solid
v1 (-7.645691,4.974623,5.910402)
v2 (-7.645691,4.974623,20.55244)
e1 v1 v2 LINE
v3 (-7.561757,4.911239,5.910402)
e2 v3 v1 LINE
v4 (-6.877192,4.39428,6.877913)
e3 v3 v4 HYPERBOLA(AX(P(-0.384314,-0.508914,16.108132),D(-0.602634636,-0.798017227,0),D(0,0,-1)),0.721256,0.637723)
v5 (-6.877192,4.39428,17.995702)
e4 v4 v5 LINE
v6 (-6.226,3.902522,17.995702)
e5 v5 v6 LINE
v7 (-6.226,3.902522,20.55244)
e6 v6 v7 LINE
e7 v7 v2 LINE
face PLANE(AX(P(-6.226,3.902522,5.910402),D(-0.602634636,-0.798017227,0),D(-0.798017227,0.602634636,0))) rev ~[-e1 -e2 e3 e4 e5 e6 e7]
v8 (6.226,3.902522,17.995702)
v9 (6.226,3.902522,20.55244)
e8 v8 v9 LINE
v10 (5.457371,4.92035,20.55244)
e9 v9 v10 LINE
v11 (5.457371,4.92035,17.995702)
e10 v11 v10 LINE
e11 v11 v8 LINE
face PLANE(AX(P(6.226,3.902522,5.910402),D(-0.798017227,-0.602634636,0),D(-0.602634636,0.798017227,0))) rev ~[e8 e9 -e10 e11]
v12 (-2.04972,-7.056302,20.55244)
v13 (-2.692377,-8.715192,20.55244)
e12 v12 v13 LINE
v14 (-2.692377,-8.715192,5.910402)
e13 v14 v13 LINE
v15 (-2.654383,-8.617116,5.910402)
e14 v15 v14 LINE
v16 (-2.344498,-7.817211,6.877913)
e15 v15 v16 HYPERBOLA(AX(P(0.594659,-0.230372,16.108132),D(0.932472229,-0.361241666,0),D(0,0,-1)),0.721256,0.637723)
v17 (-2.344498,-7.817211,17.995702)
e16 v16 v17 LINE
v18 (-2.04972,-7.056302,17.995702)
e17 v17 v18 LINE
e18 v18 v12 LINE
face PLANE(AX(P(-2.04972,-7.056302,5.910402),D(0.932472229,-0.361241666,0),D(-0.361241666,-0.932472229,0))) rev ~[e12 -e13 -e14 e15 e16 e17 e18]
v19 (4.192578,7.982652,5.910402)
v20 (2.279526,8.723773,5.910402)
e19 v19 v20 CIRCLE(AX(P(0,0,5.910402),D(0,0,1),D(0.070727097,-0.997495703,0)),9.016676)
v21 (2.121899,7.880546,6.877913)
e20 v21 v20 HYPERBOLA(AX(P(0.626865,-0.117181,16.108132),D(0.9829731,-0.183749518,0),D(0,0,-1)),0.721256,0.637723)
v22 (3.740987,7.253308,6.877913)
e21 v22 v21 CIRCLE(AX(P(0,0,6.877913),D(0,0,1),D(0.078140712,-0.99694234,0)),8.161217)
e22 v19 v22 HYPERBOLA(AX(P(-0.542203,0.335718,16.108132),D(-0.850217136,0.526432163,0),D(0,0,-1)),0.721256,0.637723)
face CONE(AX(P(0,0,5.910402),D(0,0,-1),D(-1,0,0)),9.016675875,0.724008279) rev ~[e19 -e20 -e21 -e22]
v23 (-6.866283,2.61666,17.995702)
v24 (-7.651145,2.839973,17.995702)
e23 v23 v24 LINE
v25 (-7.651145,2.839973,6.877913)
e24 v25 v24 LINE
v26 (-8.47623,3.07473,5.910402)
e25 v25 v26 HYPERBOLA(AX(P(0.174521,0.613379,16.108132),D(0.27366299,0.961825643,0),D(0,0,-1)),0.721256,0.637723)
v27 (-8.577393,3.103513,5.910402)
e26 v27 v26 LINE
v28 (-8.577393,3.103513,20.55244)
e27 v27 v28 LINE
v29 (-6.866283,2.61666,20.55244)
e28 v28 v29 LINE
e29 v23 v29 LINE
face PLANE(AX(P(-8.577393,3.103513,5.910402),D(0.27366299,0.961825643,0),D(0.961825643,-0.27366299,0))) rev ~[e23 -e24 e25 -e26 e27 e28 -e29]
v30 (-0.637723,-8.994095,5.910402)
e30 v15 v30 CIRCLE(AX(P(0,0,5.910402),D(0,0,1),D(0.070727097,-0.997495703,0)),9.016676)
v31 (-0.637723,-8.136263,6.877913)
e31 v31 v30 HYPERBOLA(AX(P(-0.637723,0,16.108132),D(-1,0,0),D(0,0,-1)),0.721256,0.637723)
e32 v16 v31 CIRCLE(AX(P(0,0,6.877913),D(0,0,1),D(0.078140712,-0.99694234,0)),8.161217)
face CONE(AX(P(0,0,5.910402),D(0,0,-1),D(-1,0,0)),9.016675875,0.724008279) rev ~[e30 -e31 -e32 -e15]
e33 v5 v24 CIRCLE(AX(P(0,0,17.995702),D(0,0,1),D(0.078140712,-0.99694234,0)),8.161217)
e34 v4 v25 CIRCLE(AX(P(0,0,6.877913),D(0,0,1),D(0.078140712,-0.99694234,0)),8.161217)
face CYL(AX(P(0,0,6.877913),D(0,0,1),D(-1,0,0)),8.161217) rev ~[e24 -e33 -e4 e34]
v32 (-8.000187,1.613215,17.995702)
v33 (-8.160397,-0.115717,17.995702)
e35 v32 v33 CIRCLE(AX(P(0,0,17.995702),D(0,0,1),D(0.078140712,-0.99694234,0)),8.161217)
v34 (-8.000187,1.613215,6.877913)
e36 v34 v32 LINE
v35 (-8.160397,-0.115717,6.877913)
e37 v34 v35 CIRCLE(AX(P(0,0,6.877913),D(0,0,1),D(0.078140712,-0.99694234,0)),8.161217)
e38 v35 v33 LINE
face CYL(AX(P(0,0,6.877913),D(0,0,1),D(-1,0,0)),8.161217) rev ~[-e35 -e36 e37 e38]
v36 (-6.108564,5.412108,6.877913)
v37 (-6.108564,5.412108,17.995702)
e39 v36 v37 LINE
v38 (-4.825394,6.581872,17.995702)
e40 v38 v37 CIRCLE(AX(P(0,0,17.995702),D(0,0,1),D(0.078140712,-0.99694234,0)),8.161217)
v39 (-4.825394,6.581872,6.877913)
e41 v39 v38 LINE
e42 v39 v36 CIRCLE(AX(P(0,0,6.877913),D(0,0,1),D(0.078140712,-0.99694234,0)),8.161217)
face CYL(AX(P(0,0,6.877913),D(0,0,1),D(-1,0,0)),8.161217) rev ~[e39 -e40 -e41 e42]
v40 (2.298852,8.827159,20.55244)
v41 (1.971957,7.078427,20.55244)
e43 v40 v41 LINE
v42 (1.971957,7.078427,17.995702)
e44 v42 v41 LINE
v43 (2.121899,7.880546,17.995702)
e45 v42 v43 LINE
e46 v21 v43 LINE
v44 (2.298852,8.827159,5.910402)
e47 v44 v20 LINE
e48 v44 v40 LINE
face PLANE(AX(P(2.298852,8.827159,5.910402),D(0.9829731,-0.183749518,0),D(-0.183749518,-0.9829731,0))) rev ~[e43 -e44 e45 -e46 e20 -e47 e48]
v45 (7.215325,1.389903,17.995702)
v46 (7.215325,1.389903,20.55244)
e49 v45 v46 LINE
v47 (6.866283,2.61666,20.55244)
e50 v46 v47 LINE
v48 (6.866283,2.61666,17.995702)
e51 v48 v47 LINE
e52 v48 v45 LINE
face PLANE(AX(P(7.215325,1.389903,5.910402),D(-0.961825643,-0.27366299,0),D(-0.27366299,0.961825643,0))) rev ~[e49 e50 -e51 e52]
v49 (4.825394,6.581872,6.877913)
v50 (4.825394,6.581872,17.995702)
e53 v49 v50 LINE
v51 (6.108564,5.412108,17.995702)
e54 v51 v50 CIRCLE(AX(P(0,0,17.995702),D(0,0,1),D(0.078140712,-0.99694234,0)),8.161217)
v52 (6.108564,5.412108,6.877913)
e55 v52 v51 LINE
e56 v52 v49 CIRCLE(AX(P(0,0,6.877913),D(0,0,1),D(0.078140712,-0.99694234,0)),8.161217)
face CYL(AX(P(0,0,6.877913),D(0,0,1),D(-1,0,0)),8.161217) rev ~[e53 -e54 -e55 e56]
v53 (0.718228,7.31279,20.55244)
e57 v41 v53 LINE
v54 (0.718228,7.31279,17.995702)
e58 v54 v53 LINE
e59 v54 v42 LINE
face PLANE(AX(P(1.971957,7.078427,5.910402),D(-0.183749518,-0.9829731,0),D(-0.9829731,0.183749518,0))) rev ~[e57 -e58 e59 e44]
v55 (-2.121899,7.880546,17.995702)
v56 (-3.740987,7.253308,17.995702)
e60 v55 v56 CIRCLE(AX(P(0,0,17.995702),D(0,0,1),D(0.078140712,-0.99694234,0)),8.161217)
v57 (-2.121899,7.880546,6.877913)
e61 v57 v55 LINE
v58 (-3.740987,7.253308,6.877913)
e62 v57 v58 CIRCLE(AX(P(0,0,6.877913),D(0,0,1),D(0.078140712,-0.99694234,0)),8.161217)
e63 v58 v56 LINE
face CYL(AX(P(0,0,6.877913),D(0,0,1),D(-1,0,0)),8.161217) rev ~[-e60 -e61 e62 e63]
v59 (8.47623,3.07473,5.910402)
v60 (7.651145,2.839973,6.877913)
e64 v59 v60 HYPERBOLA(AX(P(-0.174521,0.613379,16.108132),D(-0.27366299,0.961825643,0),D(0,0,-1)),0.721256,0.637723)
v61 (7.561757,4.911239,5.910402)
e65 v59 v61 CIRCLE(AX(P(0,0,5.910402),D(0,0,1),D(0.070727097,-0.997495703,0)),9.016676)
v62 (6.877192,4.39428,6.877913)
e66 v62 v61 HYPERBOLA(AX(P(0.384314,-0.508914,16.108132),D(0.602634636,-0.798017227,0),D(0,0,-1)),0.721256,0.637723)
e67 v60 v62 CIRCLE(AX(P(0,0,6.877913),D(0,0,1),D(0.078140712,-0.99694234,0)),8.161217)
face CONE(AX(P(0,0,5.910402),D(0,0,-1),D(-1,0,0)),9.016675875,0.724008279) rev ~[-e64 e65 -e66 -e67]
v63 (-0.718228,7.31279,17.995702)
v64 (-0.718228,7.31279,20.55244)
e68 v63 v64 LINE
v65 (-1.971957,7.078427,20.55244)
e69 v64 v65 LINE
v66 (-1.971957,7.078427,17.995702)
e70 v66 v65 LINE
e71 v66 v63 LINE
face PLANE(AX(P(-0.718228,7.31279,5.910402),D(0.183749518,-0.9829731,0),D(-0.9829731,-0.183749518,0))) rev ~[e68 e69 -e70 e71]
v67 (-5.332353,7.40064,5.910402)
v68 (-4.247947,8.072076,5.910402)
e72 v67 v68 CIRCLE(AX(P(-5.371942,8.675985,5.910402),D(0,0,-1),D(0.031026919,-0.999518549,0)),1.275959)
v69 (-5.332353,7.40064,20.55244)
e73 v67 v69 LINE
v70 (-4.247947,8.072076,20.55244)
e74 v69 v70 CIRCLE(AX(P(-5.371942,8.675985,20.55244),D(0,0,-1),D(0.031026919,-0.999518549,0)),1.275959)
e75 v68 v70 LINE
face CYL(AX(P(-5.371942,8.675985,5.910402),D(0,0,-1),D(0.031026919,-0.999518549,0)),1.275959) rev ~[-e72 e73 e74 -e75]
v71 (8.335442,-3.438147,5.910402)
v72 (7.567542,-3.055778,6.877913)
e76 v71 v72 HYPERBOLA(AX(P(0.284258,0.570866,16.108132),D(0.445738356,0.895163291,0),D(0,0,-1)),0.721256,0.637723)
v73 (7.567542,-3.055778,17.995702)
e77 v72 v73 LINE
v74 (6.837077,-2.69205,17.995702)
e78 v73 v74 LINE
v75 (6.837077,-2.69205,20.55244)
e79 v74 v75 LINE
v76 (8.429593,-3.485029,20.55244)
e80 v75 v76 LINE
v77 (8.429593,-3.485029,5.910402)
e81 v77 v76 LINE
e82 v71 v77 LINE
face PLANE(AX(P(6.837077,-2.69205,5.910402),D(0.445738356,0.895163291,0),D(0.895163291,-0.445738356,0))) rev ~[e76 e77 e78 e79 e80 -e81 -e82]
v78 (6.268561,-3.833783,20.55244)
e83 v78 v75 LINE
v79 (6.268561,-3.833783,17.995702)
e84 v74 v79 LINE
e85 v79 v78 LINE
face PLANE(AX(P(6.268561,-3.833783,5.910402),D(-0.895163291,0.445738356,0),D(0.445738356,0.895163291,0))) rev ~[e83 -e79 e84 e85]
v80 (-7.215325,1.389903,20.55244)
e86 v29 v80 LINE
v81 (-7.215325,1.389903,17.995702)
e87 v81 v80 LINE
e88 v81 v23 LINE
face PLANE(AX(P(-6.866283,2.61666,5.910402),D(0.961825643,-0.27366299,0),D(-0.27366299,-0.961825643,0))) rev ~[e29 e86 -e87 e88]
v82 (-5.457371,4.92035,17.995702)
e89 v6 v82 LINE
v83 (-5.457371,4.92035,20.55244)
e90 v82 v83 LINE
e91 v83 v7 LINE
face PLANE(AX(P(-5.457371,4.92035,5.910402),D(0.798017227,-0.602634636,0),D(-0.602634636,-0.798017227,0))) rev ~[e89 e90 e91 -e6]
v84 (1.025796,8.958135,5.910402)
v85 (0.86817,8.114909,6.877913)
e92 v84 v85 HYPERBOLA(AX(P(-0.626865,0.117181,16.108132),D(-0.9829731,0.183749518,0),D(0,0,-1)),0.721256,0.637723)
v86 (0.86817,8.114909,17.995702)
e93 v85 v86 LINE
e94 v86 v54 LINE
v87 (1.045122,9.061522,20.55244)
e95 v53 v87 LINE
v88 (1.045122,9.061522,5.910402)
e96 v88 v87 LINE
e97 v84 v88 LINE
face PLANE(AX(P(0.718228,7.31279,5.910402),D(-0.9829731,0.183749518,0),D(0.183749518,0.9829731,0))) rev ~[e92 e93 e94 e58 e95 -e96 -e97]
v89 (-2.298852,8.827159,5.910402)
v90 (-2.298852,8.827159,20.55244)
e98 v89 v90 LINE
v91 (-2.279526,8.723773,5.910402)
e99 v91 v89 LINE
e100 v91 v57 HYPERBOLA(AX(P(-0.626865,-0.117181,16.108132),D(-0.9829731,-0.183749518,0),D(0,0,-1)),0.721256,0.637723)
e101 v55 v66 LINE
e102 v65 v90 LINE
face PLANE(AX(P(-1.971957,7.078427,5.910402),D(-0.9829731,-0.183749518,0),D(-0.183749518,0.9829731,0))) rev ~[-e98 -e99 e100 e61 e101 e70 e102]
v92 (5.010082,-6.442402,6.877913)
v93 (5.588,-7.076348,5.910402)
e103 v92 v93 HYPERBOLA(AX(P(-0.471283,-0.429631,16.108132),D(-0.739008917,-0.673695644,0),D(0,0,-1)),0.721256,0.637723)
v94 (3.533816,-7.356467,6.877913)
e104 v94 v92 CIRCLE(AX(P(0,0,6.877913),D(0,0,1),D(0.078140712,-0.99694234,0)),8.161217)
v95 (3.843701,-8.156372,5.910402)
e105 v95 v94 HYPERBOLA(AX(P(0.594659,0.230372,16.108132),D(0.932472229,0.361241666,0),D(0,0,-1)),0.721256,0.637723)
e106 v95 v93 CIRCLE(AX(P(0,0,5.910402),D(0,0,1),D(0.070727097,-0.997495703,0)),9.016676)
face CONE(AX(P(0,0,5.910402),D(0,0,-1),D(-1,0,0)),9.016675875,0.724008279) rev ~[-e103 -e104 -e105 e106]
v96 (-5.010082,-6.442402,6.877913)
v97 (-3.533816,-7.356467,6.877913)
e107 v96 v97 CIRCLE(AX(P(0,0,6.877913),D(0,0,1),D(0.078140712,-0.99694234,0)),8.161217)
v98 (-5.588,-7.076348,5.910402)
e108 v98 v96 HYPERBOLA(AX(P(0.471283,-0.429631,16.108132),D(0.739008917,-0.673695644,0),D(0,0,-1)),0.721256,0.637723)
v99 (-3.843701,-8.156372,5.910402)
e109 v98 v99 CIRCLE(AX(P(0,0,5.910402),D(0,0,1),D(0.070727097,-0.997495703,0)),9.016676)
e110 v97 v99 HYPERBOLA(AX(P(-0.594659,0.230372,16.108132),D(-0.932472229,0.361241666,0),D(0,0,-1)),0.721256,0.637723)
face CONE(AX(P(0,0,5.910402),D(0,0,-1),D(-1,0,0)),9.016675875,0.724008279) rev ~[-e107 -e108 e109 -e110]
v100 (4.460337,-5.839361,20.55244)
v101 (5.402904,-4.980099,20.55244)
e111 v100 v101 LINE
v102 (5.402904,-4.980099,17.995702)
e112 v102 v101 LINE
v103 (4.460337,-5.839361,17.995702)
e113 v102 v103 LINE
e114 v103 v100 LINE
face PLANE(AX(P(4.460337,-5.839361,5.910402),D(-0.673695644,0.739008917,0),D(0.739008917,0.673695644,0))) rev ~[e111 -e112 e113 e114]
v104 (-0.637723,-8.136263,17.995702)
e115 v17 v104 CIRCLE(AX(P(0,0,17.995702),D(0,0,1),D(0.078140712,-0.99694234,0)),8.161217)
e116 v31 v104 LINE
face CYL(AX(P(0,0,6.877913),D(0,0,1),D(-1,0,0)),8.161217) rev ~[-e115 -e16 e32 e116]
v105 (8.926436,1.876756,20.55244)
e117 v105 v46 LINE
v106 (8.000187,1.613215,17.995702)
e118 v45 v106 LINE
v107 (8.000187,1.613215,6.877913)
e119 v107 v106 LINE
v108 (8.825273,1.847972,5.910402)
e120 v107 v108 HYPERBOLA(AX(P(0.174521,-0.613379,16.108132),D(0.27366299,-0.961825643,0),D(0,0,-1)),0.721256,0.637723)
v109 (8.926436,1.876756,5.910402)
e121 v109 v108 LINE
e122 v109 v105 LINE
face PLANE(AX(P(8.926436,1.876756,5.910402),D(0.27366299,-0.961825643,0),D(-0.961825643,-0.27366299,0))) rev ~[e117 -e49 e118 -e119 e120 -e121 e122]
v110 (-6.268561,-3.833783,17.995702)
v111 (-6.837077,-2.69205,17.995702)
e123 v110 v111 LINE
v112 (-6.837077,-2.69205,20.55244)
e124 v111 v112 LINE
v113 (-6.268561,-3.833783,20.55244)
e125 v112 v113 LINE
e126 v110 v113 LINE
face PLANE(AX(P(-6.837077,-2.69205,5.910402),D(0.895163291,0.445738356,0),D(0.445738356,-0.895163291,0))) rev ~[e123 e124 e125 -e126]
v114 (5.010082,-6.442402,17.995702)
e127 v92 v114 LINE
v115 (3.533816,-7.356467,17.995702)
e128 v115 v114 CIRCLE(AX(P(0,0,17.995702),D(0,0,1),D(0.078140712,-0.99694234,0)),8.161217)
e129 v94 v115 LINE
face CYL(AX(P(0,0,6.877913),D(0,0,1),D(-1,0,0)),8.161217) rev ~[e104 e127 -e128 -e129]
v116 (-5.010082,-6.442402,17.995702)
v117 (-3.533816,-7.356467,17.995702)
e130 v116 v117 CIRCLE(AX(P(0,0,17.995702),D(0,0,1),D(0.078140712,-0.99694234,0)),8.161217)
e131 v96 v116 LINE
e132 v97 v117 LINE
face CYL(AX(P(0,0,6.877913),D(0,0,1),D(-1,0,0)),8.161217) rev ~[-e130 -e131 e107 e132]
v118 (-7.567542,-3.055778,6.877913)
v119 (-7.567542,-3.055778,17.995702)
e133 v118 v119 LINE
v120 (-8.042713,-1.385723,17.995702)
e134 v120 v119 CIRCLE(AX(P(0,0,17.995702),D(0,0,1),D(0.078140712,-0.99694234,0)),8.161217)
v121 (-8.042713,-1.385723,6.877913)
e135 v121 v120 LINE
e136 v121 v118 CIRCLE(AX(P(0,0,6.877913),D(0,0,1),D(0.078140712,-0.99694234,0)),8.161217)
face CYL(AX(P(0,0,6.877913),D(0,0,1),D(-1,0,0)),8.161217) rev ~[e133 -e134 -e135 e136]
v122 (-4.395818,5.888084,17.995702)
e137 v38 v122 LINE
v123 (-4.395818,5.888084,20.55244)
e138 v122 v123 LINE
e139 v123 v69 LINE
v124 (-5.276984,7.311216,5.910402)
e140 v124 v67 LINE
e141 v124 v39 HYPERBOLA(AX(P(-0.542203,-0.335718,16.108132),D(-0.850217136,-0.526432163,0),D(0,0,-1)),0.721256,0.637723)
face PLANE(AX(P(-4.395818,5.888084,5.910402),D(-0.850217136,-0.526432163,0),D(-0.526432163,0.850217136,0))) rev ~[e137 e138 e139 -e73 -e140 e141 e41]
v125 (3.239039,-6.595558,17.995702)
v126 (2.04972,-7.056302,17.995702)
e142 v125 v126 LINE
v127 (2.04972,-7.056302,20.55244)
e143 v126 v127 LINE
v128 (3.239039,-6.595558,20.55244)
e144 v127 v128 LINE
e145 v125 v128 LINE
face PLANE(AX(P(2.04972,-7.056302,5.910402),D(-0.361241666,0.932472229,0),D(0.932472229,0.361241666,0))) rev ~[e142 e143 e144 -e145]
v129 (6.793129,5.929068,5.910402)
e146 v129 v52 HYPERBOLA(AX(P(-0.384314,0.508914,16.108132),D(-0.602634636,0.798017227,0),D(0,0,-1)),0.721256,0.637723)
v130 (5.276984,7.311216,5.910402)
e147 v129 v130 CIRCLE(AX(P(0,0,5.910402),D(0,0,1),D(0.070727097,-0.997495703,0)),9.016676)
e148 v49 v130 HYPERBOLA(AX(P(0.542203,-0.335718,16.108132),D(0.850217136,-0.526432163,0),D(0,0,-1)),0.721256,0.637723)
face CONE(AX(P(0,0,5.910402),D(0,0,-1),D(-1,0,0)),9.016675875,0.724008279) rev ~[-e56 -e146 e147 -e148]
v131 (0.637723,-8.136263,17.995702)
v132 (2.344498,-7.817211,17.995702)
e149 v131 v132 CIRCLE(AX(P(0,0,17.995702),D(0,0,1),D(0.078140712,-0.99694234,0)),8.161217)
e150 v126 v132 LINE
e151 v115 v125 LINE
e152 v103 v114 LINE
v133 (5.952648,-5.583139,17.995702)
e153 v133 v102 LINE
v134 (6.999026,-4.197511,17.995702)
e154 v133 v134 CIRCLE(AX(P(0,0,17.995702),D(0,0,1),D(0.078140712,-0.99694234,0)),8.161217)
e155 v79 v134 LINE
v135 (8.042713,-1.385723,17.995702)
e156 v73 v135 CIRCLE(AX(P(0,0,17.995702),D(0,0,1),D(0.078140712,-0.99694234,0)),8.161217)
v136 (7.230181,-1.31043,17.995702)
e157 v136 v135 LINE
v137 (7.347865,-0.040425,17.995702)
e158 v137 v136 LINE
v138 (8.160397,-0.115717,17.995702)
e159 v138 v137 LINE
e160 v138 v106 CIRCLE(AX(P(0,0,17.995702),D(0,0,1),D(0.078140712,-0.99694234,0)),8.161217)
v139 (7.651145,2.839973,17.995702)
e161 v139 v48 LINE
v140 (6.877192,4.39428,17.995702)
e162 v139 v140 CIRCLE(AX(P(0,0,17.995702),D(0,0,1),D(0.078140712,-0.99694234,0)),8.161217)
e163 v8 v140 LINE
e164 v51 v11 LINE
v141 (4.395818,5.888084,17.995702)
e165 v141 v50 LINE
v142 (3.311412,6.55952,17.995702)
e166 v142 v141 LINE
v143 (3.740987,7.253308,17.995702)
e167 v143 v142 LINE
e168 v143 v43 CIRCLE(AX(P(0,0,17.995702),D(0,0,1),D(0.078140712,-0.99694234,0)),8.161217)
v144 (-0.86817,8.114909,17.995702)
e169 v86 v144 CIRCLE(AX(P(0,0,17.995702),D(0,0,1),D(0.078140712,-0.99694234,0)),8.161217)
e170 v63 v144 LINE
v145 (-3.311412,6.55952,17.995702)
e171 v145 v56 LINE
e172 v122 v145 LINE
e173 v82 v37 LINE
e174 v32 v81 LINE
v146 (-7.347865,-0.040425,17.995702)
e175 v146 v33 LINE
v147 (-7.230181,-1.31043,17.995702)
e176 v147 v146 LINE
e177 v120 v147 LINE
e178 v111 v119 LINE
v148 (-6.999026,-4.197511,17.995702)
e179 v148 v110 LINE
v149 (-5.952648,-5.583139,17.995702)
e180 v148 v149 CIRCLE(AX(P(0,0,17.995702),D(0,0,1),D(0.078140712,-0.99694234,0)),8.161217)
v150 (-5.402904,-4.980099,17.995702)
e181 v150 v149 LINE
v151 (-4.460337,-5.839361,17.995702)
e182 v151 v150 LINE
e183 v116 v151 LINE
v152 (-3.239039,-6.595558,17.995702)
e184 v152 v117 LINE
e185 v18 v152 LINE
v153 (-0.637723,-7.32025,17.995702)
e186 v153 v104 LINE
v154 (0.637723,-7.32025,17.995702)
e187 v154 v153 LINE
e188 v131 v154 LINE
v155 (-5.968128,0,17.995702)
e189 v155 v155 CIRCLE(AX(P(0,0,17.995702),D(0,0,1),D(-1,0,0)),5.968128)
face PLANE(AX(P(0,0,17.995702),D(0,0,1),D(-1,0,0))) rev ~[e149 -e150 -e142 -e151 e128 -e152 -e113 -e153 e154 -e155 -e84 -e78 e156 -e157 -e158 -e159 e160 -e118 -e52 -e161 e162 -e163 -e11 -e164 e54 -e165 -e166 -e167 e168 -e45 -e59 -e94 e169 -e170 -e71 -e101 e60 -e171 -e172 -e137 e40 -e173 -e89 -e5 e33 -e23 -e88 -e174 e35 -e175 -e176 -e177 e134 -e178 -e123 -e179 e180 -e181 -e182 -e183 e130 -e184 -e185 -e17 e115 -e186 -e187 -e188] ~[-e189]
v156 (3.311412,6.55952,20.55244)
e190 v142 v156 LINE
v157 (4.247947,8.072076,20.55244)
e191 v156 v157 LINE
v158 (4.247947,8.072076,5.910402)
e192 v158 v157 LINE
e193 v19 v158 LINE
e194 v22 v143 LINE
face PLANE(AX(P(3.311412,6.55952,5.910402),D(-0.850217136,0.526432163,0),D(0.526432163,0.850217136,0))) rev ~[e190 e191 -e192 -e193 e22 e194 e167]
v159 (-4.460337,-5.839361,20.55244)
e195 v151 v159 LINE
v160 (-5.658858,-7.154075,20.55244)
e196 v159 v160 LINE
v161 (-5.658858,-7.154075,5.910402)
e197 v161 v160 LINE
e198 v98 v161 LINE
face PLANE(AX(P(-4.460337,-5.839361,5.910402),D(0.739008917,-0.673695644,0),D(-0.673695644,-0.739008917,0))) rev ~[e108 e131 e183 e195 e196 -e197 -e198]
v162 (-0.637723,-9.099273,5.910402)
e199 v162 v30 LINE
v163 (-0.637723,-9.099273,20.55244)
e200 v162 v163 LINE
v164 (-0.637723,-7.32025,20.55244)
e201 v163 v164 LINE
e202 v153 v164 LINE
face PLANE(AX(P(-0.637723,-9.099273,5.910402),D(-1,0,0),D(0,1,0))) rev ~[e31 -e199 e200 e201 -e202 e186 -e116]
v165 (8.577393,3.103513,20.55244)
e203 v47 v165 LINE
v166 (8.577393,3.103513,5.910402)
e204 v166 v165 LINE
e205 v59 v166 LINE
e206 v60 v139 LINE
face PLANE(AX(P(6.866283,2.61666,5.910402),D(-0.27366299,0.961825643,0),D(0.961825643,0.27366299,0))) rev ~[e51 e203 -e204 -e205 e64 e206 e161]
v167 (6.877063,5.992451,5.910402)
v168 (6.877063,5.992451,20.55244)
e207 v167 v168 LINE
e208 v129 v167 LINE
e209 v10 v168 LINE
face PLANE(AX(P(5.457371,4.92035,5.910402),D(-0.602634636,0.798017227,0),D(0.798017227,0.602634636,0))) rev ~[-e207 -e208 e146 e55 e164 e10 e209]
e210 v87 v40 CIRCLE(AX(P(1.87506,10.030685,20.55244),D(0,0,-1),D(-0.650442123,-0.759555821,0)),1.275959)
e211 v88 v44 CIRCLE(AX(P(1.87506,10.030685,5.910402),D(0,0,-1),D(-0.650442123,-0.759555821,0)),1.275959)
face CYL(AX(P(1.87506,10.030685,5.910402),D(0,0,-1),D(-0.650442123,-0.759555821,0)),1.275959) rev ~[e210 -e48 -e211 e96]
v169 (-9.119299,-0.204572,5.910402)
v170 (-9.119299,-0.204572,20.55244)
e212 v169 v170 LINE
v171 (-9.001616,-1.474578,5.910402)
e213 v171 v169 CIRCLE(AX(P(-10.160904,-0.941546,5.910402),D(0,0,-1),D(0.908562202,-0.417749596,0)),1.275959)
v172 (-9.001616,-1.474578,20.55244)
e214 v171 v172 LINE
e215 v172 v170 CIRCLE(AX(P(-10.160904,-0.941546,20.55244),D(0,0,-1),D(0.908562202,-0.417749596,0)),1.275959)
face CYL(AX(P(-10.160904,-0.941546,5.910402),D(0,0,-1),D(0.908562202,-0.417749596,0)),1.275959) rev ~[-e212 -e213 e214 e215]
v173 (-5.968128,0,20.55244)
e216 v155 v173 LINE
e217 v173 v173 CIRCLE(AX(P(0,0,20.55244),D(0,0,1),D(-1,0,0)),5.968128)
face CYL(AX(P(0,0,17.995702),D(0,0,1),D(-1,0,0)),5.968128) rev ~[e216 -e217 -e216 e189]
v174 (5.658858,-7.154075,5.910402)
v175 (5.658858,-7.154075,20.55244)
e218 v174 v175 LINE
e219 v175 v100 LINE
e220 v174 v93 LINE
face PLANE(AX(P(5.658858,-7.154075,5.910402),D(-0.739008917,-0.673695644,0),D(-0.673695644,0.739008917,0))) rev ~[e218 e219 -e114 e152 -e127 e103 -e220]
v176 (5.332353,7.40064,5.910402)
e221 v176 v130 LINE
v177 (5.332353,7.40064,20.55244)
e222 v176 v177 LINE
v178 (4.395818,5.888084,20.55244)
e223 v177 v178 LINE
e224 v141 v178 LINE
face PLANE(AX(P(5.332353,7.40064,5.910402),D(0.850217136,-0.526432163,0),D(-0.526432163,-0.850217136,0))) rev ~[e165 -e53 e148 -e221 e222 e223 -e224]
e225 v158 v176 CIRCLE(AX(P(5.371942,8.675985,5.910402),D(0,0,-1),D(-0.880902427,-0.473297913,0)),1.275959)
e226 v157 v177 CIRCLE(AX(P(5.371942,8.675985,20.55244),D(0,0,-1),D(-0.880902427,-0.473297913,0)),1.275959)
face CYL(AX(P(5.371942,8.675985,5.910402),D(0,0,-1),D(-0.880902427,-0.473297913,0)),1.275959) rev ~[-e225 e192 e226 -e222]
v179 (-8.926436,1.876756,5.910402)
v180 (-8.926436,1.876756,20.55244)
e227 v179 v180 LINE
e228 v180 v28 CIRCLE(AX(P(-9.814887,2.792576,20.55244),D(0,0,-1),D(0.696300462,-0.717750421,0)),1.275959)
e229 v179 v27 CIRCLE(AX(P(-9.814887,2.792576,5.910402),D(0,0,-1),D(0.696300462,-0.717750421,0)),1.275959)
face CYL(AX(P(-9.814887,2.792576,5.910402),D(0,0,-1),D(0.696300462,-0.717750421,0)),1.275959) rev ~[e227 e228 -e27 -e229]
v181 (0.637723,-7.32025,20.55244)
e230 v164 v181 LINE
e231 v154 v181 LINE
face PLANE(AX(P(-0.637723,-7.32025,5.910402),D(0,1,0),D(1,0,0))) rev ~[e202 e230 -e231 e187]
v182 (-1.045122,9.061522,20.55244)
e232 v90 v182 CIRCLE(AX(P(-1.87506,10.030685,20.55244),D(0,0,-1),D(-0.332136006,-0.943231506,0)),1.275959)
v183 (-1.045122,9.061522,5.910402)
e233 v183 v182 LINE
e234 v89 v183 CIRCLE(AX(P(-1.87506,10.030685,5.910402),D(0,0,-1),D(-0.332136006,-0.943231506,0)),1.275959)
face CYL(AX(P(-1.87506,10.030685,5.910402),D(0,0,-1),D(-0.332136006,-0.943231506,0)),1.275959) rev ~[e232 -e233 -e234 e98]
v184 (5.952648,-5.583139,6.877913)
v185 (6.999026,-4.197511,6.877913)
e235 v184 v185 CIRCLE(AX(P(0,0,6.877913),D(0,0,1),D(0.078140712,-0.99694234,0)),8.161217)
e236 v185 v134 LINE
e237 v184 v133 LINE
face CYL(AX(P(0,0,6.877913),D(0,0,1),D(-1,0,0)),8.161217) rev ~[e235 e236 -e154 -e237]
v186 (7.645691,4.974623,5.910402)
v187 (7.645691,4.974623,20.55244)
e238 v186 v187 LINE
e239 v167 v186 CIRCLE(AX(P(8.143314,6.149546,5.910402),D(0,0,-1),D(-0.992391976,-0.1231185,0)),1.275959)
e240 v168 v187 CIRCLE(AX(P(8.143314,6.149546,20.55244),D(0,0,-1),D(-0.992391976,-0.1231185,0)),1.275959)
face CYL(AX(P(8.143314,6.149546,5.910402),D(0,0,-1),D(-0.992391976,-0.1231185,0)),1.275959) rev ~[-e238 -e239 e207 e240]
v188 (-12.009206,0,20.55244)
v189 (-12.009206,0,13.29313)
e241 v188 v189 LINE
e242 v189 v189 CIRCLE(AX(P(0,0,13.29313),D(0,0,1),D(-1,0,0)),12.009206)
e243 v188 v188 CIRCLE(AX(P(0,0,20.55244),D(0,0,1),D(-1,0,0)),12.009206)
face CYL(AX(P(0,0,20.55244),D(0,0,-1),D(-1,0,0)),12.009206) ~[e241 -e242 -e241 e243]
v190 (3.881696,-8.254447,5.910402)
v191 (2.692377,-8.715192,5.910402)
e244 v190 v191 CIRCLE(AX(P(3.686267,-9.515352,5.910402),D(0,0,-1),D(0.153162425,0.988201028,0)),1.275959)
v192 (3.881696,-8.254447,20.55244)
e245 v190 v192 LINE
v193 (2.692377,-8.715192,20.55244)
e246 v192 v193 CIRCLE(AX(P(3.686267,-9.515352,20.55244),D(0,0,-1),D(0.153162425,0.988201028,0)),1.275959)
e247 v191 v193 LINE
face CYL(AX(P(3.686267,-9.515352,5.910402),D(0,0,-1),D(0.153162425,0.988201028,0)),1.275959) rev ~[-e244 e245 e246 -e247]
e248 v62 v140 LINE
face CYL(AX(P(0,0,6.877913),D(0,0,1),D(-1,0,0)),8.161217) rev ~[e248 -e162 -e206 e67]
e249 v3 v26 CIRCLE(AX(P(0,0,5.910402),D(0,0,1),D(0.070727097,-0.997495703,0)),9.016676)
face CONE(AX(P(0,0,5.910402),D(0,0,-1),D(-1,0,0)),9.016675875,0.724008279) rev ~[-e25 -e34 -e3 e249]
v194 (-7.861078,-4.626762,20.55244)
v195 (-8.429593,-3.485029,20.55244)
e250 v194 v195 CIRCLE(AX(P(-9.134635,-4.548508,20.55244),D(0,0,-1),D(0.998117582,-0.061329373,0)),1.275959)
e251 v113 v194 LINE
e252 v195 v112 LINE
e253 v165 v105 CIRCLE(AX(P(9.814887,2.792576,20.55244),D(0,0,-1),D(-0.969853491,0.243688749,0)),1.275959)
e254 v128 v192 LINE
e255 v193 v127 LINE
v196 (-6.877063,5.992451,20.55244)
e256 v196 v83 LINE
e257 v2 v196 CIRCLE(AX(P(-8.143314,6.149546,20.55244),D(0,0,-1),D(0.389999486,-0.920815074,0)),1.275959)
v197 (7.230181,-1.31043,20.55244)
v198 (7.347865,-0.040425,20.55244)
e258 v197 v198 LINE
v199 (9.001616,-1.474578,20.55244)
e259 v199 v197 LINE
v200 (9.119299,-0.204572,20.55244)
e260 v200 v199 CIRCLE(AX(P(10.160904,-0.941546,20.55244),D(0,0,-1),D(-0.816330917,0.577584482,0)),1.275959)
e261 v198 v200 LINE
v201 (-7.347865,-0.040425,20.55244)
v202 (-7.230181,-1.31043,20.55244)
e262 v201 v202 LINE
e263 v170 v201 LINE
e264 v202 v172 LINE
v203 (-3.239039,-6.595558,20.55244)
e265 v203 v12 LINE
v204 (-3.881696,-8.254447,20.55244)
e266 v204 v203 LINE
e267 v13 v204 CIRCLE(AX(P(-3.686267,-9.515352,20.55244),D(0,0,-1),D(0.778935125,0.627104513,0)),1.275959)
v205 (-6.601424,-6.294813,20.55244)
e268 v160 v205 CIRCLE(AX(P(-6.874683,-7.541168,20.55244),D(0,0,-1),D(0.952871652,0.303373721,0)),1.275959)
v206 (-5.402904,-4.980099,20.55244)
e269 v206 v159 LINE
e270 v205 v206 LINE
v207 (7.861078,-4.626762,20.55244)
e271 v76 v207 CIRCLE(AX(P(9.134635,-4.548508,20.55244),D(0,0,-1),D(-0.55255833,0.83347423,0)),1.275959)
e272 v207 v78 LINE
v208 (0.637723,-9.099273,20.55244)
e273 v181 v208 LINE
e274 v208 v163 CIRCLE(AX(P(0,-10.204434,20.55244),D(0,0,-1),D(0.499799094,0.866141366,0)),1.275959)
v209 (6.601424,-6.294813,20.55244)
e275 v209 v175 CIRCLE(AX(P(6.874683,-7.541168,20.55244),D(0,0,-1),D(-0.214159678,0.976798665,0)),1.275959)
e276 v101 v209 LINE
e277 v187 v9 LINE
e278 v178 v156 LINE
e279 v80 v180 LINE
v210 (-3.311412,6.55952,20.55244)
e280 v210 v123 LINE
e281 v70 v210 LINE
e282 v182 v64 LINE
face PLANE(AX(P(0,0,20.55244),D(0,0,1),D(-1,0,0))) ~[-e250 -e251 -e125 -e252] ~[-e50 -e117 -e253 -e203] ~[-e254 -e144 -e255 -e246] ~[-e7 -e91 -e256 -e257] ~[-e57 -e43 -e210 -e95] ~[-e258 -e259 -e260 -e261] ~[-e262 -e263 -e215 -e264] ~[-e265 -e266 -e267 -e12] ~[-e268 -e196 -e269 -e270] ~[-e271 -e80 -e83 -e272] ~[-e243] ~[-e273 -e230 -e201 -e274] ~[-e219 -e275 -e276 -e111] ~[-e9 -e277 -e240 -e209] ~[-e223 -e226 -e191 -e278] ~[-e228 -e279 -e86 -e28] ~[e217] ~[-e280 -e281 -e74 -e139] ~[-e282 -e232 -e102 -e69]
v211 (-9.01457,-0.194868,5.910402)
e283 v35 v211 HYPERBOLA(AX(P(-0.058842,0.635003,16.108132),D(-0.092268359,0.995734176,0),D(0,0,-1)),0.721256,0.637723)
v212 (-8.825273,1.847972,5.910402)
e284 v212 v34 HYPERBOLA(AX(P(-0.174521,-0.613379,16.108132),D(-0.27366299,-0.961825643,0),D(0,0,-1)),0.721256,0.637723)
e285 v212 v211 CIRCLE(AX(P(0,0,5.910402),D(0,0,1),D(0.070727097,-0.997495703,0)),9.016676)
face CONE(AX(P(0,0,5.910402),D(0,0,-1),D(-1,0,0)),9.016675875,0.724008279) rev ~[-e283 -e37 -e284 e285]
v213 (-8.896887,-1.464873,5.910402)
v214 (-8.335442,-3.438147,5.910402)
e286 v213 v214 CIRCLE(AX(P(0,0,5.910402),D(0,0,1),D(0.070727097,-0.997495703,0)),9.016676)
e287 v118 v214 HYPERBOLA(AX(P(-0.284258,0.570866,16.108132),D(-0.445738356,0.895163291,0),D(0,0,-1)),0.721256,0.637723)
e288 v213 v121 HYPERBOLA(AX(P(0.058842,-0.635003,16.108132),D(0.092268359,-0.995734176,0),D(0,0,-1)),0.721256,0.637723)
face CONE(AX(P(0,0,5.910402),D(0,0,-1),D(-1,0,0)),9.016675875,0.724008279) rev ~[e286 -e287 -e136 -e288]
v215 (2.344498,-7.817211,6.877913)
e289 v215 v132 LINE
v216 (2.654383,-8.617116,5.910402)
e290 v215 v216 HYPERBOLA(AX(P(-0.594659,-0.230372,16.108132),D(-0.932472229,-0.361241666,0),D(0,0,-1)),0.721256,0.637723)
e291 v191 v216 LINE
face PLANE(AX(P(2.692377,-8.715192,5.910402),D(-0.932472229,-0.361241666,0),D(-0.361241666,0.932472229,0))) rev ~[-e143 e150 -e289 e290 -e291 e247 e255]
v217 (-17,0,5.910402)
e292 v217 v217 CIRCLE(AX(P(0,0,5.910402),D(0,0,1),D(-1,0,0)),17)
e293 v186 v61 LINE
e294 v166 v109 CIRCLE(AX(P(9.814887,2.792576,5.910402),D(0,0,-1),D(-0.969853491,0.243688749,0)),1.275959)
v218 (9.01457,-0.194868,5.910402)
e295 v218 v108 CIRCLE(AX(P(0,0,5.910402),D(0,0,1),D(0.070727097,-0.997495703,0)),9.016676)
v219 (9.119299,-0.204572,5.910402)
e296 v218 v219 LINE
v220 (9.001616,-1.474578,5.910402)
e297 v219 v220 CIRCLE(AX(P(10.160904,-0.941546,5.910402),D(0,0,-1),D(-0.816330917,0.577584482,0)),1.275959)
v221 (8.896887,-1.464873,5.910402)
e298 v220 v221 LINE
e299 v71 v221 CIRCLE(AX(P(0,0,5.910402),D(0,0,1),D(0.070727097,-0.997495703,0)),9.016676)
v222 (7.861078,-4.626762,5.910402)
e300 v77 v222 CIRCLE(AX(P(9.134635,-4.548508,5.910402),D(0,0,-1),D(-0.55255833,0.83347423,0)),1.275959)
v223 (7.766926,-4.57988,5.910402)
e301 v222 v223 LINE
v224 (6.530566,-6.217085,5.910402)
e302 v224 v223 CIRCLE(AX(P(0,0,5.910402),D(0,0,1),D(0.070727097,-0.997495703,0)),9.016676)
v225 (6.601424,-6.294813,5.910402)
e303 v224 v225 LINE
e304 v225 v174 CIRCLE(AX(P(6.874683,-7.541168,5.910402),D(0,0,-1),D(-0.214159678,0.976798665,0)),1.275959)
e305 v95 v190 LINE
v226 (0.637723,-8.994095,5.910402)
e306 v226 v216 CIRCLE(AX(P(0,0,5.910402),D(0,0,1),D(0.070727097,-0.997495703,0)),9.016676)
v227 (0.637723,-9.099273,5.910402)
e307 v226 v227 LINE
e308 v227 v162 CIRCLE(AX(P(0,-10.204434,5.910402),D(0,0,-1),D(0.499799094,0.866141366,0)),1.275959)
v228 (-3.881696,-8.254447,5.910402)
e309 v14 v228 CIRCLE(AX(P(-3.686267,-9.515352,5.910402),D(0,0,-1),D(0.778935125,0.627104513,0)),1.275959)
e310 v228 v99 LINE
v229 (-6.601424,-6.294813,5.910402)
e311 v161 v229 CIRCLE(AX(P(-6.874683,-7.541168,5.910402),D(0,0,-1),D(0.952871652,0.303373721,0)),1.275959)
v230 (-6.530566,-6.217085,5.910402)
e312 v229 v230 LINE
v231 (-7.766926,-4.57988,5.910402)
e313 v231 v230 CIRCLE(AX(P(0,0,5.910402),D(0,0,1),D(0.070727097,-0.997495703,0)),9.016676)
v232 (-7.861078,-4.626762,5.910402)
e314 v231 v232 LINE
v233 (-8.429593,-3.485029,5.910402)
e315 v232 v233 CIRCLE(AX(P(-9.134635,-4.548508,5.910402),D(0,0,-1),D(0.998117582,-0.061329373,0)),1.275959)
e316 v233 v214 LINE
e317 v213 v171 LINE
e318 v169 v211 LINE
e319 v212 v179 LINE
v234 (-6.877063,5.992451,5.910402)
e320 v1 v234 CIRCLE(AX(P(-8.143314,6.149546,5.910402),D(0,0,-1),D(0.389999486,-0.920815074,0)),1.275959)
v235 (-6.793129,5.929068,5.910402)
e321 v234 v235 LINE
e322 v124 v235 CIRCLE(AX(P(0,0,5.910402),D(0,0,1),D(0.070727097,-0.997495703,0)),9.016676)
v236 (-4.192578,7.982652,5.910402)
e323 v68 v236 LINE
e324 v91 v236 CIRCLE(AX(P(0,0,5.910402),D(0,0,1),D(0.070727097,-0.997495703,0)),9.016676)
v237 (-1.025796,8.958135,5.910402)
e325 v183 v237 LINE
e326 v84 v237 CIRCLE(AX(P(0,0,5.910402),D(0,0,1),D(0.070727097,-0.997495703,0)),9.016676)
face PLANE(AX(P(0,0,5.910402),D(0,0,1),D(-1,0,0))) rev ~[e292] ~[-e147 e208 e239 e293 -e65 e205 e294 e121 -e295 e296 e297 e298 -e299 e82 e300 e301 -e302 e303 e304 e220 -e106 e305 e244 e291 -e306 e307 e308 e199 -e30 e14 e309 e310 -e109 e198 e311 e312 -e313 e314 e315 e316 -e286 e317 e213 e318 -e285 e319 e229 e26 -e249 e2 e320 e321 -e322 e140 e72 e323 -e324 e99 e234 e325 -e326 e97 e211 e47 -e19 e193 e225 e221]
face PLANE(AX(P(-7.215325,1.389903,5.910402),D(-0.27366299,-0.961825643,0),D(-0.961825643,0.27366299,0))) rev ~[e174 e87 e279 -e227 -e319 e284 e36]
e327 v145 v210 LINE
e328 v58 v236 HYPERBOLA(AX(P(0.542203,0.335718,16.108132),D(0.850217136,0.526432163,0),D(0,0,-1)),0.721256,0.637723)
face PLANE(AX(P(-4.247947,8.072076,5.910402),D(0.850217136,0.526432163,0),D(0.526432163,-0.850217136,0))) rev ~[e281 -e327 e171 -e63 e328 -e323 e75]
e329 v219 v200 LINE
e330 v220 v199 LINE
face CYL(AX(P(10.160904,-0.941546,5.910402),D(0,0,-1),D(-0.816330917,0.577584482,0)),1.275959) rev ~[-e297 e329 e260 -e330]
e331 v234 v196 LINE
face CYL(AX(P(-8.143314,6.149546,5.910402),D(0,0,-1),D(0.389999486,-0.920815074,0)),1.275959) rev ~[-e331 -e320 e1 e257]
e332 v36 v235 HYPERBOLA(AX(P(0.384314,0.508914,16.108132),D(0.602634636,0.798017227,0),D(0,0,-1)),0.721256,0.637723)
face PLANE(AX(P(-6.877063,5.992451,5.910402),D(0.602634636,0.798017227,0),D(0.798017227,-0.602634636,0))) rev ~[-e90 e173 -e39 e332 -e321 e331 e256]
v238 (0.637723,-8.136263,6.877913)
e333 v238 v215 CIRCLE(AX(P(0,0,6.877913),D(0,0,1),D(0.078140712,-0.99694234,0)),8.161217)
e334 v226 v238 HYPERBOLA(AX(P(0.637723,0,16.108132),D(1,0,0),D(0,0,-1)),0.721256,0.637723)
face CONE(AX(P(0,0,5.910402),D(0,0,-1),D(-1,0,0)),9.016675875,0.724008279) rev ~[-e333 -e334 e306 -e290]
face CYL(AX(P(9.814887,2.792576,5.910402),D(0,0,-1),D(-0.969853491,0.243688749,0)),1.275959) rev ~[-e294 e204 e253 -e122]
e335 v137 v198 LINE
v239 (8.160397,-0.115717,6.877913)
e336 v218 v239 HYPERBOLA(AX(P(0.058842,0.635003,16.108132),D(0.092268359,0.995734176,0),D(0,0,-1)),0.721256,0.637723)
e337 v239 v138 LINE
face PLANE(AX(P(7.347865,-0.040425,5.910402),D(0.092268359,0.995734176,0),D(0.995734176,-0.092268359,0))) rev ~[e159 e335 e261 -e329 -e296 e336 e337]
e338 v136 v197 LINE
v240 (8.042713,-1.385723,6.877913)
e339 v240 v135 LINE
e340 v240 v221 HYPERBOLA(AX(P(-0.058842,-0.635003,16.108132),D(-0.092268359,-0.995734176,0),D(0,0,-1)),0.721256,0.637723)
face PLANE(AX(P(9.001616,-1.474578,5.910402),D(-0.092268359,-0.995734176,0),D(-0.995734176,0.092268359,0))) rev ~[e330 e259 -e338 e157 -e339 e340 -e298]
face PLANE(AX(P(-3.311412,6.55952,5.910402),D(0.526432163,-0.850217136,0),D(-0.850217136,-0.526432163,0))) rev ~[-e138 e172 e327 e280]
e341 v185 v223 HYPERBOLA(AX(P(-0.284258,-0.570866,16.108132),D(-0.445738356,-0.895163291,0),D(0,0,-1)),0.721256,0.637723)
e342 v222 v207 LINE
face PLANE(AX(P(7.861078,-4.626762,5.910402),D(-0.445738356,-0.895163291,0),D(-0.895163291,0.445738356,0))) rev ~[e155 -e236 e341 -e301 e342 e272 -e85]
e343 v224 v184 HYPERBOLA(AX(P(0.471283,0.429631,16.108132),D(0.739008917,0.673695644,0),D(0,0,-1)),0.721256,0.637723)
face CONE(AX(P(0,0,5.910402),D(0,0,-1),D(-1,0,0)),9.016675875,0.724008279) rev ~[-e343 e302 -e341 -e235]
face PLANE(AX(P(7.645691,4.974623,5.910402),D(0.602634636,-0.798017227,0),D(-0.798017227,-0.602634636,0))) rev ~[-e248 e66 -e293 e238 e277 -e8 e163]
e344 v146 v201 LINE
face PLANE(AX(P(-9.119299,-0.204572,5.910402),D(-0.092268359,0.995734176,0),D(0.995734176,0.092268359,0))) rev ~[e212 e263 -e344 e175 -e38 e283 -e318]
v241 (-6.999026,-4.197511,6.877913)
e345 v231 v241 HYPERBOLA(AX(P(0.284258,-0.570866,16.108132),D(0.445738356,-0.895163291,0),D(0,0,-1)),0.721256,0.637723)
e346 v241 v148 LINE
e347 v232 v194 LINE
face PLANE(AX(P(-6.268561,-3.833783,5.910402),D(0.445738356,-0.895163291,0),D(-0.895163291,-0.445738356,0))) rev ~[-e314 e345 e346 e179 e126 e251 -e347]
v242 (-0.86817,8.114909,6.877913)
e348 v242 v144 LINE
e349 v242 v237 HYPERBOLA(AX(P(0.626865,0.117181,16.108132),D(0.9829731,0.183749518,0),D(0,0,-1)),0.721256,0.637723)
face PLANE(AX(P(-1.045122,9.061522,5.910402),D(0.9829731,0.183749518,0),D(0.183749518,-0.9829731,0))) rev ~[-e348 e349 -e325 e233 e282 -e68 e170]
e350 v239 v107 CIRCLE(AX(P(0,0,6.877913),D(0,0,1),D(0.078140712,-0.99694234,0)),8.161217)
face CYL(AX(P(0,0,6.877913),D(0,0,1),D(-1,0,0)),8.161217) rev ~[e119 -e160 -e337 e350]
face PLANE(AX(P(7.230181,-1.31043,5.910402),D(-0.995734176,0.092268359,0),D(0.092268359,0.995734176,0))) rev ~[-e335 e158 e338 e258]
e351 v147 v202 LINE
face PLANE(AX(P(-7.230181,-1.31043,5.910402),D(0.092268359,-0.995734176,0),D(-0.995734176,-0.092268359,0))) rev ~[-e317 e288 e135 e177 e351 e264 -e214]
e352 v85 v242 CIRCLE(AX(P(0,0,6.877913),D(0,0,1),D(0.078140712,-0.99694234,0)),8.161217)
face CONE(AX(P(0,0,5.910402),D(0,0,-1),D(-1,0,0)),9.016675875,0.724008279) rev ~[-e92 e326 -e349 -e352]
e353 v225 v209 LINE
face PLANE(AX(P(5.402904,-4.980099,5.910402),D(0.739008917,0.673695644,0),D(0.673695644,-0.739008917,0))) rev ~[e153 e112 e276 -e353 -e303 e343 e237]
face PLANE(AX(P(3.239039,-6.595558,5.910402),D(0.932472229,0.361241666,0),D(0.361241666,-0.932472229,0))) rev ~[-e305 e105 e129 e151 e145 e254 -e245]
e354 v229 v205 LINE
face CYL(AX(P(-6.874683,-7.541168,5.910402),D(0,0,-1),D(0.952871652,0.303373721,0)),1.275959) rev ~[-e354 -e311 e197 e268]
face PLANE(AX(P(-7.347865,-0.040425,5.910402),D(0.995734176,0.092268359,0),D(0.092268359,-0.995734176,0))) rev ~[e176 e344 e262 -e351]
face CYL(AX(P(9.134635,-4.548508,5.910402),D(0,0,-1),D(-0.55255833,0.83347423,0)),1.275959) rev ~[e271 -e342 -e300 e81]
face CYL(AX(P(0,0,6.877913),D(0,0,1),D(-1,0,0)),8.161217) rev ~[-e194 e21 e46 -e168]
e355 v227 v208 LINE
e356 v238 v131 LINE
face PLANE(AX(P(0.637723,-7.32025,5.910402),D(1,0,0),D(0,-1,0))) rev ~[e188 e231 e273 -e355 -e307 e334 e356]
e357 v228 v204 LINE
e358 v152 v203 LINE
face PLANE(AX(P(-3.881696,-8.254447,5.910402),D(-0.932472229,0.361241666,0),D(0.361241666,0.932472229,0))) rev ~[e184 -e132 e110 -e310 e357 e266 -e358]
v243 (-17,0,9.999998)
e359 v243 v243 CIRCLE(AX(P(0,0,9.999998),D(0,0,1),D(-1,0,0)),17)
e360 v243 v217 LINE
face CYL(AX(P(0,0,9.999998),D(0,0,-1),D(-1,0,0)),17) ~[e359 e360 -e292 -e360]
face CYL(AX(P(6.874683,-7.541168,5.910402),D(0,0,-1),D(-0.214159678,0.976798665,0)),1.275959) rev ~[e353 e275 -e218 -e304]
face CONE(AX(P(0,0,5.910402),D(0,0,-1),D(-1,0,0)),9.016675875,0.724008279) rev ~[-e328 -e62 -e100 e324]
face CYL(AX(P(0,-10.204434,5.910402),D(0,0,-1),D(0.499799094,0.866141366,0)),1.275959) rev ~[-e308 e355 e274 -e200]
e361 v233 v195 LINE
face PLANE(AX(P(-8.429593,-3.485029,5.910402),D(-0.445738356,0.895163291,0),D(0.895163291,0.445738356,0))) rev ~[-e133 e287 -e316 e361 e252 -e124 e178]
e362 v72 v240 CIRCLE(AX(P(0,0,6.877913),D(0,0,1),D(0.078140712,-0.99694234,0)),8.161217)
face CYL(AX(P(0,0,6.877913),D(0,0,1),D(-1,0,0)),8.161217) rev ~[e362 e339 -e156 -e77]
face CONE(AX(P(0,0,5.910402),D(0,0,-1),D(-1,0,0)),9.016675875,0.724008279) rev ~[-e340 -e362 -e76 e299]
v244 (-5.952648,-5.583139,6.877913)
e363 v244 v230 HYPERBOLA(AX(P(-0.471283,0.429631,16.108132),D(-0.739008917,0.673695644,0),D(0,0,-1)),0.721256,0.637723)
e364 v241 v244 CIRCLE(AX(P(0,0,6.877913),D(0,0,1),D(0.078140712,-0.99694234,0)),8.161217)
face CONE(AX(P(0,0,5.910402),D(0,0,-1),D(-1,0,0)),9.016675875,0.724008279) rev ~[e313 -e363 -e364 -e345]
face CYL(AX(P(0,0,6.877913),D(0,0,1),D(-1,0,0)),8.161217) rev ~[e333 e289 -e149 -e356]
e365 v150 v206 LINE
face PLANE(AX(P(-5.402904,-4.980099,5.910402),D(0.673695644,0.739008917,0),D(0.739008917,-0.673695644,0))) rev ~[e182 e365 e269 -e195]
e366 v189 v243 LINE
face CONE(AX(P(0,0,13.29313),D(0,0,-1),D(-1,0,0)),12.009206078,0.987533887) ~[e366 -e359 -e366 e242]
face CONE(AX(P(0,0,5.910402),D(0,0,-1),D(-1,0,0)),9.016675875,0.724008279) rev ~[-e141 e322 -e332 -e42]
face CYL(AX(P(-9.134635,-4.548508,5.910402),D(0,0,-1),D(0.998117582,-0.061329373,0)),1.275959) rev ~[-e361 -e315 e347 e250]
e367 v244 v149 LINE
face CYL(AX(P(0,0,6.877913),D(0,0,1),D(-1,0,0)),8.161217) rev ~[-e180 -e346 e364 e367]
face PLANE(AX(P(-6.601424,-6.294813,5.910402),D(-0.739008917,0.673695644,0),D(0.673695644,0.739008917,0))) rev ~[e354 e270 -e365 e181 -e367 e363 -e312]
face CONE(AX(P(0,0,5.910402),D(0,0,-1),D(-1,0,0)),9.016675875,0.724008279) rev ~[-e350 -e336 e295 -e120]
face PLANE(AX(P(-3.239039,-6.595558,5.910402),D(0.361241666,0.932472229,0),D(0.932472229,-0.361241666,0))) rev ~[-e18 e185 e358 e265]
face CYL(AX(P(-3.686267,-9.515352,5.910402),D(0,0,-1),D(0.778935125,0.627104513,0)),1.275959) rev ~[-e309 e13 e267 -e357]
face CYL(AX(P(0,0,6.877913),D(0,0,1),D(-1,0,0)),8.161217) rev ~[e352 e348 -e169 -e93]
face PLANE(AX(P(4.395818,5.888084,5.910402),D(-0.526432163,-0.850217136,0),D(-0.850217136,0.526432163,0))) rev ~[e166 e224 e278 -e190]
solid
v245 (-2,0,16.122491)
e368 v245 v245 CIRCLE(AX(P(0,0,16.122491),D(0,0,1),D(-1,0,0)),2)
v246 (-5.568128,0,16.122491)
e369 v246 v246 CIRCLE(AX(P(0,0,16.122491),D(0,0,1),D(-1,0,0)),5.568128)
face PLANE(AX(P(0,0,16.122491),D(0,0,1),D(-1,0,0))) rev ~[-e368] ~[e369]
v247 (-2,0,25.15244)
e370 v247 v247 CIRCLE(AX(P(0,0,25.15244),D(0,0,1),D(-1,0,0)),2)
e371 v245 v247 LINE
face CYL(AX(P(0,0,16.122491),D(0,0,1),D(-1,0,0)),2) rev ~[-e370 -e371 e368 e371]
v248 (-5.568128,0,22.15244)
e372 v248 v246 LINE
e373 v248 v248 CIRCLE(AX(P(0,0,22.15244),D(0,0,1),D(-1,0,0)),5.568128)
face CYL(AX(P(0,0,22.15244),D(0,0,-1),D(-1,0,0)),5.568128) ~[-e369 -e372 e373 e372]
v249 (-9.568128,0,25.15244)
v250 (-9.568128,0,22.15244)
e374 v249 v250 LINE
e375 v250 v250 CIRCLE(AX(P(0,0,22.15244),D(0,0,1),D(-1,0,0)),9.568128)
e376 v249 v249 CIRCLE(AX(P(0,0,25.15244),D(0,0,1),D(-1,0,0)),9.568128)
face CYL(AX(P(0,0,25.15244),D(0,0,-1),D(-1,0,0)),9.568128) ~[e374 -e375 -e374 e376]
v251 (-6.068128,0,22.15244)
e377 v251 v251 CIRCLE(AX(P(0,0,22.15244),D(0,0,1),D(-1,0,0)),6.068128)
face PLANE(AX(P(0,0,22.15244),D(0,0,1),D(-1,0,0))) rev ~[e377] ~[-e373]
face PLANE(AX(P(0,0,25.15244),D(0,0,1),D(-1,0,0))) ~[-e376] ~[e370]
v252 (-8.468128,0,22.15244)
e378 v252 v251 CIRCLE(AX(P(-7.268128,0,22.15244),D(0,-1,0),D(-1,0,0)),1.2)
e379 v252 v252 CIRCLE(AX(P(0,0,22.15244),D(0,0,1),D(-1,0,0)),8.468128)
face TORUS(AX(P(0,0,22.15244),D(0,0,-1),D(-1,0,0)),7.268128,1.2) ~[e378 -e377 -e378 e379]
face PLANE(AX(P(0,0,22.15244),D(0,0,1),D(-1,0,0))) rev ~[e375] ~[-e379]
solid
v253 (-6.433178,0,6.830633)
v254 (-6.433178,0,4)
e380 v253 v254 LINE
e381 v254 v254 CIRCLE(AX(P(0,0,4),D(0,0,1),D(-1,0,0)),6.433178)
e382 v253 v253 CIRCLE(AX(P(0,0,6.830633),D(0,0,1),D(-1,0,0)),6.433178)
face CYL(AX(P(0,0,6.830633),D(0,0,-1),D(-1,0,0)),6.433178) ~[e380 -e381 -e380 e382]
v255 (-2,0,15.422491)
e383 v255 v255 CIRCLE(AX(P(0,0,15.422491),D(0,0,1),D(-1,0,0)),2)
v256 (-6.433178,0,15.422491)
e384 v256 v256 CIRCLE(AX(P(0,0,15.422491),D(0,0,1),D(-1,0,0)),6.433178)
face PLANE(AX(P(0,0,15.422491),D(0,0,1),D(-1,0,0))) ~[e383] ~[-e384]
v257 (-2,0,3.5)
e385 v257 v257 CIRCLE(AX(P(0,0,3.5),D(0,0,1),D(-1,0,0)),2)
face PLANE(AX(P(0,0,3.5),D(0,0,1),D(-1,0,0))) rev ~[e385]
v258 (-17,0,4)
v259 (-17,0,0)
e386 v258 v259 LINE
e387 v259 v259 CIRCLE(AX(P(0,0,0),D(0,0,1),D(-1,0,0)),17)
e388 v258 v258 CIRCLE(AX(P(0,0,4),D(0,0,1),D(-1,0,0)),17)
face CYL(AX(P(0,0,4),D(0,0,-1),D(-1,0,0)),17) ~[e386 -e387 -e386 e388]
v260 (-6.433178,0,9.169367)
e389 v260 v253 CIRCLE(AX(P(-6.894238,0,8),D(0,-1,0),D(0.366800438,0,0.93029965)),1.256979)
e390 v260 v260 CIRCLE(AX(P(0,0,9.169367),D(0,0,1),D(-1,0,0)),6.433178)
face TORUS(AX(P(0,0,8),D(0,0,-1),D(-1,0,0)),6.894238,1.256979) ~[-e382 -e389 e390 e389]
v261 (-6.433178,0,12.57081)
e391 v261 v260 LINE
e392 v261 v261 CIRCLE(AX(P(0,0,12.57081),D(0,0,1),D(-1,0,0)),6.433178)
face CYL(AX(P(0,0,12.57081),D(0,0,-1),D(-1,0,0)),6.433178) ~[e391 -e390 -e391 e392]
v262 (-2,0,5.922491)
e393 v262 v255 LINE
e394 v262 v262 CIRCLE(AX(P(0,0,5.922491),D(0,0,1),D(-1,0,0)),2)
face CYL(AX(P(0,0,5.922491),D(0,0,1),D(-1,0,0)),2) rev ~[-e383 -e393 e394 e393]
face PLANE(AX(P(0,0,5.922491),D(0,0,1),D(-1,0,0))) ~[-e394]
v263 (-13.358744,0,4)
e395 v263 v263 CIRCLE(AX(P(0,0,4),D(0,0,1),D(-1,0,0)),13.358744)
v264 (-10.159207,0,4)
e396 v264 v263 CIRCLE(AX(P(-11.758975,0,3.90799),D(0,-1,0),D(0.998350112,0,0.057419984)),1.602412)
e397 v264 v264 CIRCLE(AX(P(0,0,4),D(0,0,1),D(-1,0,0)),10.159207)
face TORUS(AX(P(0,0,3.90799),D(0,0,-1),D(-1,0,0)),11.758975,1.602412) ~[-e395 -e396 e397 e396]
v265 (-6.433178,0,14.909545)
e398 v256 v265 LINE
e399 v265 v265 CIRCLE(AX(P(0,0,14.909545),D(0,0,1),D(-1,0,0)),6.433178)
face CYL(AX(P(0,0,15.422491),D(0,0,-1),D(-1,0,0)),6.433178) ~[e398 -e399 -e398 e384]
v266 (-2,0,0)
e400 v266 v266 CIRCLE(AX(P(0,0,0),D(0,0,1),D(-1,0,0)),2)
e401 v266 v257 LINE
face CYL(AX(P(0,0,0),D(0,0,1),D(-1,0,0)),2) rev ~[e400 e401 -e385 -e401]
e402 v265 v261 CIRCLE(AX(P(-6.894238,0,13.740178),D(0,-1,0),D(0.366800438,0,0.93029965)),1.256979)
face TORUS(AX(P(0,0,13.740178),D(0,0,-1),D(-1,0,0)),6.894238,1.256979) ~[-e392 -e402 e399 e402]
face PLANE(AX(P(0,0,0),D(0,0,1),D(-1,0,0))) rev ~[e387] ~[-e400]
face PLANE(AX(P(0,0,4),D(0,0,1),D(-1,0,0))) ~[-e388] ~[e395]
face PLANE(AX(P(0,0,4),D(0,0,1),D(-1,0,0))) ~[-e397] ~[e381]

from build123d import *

# Parameters (mm, degrees)
F6_DEPTH        = 19.2430383168
F6_COPIES_COUNT = 17


# Not quite as in the source:
# - a pattern or mirror of a feature is missing from the dataset's text; its kind, count and spacing are read off the source's solid


with BuildPart() as f1:
    # F0 (on Front) → F1 (revolve)
    with BuildSketch(Plane.XZ):
        with BuildLine():
            Line((-17, 4), (-17, 0))
            Line((-17, 0), (-2, 0))
            Line((-2, 0), (-2, 3.5))
            Line((-2, 3.5), (0, 3.5))
            Line((0, 3.5), (0, 5.9224911965))
            Line((0, 5.9224911965), (-2, 5.9224911965))
            Line((-2, 5.9224911965), (-2, 15.4224911965))
            Line((-2, 15.4224911965), (-6.4331775014, 15.4224911965))
            Line((-6.4331775014, 15.4224911965), (-6.4331775014, 14.9095447085))
            ThreePointArc((-6.4331775014, 14.9095447085), (-8.1512170499, 13.7401775165), (-6.4331775014, 12.5708103245))
            Line((-6.4331775014, 12.5708103245), (-6.4331775014, 9.169367192))
            ThreePointArc((-6.4331775014, 9.169367192), (-8.1512170499, 8), (-6.4331775014, 6.830632808))
            Line((-6.4331775014, 6.830632808), (-6.4331775014, 5.6004409318))
            Line((-6.4331775014, 5.6004409318), (-6.4331775014, 4))
            Line((-6.4331775014, 4), (-9.8803927539, 4))
            Line((-9.8803927539, 4), (-10.1592070531, 4))
            ThreePointArc((-10.1592070531, 4), (-11.7589752998, 5.510401574), (-13.3587435466, 4))
            Line((-13.3587435466, 4), (-13.8803896842, 4))
            Line((-13.8803896842, 4), (-17, 4))
        make_face()
    revolve(axis=Axis((0, 0, 4.7112455983), (0, 0, 1)))


with BuildPart() as f2:
    # F0 (on Front) → F2 (revolve)
    with BuildSketch(Plane.XZ):
        Polygon((-17, 5.910401574), (-9.0166758746, 5.910401574), (-8.1612170499, 6.8779131398), (-8.1612170499, 17.9957018993), (-5.968128451, 17.9957018993), (-5.968128451, 20.5524398908), (-12.0092060775, 20.5524398908), (-12.0092060775, 13.2931303233), (-17, 9.9999984652), align=None)
    revolve(axis=Axis((0, 0, 4.7112455983), (0, 0, 1)))

    # F5 (on offset) → F6 (cut, through all)
    with BuildSketch(Plane(origin=(0, 0, 5.910401574), x_dir=(1, 0, 0), z_dir=(0, 0, -1))):
        with BuildLine():
            Line((-0.6377233076, 7.3202499188), (0.6377233076, 7.3202499188))
            Line((0.6377233076, 7.3202499188), (0.6377233076, 9.0992732536))
            ThreePointArc((0.6377233076, 9.0992732536), (0, 11.4803937065), (-0.6377233076, 9.0992732536))
            Line((-0.6377233076, 9.0992732536), (-0.6377233076, 7.3202499188))
        make_face()
    f6 = extrude(amount=-F6_DEPTH, mode=Mode.SUBTRACT)

    # F6_copies: F6 ×17 about axis
    f6_copies_axis = Axis((0, 0, 0), (0, 0, 1))
    for i in range(1, F6_COPIES_COUNT):
        add(f6.rotate(f6_copies_axis, i * 360 / F6_COPIES_COUNT), mode=Mode.SUBTRACT)


with BuildPart() as f3:
    # F0 (on Front) → F3 (revolve)
    with BuildSketch(Plane.XZ):
        with BuildLine():
            Line((-5.568128451, 22.1524398908), (-5.568128451, 16.1224911965))
            Line((-5.568128451, 16.1224911965), (-2, 16.1224911965))
            Line((-2, 16.1224911965), (-2, 25.1524398908))
            Line((-2, 25.1524398908), (-9.568128451, 25.1524398908))
            Line((-9.568128451, 25.1524398908), (-9.568128451, 22.1524398908))
            Line((-9.568128451, 22.1524398908), (-8.468128451, 22.1524398908))
            ThreePointArc((-8.468128451, 22.1524398908), (-7.268128451, 20.9524398908), (-6.068128451, 22.1524398908))
            Line((-6.068128451, 22.1524398908), (-5.568128451, 22.1524398908))
        make_face()
    revolve(axis=Axis((0, 0, 4.7112455983), (0, 0, 1)))


solid = Compound([f1.part, f2.part, f3.part])
